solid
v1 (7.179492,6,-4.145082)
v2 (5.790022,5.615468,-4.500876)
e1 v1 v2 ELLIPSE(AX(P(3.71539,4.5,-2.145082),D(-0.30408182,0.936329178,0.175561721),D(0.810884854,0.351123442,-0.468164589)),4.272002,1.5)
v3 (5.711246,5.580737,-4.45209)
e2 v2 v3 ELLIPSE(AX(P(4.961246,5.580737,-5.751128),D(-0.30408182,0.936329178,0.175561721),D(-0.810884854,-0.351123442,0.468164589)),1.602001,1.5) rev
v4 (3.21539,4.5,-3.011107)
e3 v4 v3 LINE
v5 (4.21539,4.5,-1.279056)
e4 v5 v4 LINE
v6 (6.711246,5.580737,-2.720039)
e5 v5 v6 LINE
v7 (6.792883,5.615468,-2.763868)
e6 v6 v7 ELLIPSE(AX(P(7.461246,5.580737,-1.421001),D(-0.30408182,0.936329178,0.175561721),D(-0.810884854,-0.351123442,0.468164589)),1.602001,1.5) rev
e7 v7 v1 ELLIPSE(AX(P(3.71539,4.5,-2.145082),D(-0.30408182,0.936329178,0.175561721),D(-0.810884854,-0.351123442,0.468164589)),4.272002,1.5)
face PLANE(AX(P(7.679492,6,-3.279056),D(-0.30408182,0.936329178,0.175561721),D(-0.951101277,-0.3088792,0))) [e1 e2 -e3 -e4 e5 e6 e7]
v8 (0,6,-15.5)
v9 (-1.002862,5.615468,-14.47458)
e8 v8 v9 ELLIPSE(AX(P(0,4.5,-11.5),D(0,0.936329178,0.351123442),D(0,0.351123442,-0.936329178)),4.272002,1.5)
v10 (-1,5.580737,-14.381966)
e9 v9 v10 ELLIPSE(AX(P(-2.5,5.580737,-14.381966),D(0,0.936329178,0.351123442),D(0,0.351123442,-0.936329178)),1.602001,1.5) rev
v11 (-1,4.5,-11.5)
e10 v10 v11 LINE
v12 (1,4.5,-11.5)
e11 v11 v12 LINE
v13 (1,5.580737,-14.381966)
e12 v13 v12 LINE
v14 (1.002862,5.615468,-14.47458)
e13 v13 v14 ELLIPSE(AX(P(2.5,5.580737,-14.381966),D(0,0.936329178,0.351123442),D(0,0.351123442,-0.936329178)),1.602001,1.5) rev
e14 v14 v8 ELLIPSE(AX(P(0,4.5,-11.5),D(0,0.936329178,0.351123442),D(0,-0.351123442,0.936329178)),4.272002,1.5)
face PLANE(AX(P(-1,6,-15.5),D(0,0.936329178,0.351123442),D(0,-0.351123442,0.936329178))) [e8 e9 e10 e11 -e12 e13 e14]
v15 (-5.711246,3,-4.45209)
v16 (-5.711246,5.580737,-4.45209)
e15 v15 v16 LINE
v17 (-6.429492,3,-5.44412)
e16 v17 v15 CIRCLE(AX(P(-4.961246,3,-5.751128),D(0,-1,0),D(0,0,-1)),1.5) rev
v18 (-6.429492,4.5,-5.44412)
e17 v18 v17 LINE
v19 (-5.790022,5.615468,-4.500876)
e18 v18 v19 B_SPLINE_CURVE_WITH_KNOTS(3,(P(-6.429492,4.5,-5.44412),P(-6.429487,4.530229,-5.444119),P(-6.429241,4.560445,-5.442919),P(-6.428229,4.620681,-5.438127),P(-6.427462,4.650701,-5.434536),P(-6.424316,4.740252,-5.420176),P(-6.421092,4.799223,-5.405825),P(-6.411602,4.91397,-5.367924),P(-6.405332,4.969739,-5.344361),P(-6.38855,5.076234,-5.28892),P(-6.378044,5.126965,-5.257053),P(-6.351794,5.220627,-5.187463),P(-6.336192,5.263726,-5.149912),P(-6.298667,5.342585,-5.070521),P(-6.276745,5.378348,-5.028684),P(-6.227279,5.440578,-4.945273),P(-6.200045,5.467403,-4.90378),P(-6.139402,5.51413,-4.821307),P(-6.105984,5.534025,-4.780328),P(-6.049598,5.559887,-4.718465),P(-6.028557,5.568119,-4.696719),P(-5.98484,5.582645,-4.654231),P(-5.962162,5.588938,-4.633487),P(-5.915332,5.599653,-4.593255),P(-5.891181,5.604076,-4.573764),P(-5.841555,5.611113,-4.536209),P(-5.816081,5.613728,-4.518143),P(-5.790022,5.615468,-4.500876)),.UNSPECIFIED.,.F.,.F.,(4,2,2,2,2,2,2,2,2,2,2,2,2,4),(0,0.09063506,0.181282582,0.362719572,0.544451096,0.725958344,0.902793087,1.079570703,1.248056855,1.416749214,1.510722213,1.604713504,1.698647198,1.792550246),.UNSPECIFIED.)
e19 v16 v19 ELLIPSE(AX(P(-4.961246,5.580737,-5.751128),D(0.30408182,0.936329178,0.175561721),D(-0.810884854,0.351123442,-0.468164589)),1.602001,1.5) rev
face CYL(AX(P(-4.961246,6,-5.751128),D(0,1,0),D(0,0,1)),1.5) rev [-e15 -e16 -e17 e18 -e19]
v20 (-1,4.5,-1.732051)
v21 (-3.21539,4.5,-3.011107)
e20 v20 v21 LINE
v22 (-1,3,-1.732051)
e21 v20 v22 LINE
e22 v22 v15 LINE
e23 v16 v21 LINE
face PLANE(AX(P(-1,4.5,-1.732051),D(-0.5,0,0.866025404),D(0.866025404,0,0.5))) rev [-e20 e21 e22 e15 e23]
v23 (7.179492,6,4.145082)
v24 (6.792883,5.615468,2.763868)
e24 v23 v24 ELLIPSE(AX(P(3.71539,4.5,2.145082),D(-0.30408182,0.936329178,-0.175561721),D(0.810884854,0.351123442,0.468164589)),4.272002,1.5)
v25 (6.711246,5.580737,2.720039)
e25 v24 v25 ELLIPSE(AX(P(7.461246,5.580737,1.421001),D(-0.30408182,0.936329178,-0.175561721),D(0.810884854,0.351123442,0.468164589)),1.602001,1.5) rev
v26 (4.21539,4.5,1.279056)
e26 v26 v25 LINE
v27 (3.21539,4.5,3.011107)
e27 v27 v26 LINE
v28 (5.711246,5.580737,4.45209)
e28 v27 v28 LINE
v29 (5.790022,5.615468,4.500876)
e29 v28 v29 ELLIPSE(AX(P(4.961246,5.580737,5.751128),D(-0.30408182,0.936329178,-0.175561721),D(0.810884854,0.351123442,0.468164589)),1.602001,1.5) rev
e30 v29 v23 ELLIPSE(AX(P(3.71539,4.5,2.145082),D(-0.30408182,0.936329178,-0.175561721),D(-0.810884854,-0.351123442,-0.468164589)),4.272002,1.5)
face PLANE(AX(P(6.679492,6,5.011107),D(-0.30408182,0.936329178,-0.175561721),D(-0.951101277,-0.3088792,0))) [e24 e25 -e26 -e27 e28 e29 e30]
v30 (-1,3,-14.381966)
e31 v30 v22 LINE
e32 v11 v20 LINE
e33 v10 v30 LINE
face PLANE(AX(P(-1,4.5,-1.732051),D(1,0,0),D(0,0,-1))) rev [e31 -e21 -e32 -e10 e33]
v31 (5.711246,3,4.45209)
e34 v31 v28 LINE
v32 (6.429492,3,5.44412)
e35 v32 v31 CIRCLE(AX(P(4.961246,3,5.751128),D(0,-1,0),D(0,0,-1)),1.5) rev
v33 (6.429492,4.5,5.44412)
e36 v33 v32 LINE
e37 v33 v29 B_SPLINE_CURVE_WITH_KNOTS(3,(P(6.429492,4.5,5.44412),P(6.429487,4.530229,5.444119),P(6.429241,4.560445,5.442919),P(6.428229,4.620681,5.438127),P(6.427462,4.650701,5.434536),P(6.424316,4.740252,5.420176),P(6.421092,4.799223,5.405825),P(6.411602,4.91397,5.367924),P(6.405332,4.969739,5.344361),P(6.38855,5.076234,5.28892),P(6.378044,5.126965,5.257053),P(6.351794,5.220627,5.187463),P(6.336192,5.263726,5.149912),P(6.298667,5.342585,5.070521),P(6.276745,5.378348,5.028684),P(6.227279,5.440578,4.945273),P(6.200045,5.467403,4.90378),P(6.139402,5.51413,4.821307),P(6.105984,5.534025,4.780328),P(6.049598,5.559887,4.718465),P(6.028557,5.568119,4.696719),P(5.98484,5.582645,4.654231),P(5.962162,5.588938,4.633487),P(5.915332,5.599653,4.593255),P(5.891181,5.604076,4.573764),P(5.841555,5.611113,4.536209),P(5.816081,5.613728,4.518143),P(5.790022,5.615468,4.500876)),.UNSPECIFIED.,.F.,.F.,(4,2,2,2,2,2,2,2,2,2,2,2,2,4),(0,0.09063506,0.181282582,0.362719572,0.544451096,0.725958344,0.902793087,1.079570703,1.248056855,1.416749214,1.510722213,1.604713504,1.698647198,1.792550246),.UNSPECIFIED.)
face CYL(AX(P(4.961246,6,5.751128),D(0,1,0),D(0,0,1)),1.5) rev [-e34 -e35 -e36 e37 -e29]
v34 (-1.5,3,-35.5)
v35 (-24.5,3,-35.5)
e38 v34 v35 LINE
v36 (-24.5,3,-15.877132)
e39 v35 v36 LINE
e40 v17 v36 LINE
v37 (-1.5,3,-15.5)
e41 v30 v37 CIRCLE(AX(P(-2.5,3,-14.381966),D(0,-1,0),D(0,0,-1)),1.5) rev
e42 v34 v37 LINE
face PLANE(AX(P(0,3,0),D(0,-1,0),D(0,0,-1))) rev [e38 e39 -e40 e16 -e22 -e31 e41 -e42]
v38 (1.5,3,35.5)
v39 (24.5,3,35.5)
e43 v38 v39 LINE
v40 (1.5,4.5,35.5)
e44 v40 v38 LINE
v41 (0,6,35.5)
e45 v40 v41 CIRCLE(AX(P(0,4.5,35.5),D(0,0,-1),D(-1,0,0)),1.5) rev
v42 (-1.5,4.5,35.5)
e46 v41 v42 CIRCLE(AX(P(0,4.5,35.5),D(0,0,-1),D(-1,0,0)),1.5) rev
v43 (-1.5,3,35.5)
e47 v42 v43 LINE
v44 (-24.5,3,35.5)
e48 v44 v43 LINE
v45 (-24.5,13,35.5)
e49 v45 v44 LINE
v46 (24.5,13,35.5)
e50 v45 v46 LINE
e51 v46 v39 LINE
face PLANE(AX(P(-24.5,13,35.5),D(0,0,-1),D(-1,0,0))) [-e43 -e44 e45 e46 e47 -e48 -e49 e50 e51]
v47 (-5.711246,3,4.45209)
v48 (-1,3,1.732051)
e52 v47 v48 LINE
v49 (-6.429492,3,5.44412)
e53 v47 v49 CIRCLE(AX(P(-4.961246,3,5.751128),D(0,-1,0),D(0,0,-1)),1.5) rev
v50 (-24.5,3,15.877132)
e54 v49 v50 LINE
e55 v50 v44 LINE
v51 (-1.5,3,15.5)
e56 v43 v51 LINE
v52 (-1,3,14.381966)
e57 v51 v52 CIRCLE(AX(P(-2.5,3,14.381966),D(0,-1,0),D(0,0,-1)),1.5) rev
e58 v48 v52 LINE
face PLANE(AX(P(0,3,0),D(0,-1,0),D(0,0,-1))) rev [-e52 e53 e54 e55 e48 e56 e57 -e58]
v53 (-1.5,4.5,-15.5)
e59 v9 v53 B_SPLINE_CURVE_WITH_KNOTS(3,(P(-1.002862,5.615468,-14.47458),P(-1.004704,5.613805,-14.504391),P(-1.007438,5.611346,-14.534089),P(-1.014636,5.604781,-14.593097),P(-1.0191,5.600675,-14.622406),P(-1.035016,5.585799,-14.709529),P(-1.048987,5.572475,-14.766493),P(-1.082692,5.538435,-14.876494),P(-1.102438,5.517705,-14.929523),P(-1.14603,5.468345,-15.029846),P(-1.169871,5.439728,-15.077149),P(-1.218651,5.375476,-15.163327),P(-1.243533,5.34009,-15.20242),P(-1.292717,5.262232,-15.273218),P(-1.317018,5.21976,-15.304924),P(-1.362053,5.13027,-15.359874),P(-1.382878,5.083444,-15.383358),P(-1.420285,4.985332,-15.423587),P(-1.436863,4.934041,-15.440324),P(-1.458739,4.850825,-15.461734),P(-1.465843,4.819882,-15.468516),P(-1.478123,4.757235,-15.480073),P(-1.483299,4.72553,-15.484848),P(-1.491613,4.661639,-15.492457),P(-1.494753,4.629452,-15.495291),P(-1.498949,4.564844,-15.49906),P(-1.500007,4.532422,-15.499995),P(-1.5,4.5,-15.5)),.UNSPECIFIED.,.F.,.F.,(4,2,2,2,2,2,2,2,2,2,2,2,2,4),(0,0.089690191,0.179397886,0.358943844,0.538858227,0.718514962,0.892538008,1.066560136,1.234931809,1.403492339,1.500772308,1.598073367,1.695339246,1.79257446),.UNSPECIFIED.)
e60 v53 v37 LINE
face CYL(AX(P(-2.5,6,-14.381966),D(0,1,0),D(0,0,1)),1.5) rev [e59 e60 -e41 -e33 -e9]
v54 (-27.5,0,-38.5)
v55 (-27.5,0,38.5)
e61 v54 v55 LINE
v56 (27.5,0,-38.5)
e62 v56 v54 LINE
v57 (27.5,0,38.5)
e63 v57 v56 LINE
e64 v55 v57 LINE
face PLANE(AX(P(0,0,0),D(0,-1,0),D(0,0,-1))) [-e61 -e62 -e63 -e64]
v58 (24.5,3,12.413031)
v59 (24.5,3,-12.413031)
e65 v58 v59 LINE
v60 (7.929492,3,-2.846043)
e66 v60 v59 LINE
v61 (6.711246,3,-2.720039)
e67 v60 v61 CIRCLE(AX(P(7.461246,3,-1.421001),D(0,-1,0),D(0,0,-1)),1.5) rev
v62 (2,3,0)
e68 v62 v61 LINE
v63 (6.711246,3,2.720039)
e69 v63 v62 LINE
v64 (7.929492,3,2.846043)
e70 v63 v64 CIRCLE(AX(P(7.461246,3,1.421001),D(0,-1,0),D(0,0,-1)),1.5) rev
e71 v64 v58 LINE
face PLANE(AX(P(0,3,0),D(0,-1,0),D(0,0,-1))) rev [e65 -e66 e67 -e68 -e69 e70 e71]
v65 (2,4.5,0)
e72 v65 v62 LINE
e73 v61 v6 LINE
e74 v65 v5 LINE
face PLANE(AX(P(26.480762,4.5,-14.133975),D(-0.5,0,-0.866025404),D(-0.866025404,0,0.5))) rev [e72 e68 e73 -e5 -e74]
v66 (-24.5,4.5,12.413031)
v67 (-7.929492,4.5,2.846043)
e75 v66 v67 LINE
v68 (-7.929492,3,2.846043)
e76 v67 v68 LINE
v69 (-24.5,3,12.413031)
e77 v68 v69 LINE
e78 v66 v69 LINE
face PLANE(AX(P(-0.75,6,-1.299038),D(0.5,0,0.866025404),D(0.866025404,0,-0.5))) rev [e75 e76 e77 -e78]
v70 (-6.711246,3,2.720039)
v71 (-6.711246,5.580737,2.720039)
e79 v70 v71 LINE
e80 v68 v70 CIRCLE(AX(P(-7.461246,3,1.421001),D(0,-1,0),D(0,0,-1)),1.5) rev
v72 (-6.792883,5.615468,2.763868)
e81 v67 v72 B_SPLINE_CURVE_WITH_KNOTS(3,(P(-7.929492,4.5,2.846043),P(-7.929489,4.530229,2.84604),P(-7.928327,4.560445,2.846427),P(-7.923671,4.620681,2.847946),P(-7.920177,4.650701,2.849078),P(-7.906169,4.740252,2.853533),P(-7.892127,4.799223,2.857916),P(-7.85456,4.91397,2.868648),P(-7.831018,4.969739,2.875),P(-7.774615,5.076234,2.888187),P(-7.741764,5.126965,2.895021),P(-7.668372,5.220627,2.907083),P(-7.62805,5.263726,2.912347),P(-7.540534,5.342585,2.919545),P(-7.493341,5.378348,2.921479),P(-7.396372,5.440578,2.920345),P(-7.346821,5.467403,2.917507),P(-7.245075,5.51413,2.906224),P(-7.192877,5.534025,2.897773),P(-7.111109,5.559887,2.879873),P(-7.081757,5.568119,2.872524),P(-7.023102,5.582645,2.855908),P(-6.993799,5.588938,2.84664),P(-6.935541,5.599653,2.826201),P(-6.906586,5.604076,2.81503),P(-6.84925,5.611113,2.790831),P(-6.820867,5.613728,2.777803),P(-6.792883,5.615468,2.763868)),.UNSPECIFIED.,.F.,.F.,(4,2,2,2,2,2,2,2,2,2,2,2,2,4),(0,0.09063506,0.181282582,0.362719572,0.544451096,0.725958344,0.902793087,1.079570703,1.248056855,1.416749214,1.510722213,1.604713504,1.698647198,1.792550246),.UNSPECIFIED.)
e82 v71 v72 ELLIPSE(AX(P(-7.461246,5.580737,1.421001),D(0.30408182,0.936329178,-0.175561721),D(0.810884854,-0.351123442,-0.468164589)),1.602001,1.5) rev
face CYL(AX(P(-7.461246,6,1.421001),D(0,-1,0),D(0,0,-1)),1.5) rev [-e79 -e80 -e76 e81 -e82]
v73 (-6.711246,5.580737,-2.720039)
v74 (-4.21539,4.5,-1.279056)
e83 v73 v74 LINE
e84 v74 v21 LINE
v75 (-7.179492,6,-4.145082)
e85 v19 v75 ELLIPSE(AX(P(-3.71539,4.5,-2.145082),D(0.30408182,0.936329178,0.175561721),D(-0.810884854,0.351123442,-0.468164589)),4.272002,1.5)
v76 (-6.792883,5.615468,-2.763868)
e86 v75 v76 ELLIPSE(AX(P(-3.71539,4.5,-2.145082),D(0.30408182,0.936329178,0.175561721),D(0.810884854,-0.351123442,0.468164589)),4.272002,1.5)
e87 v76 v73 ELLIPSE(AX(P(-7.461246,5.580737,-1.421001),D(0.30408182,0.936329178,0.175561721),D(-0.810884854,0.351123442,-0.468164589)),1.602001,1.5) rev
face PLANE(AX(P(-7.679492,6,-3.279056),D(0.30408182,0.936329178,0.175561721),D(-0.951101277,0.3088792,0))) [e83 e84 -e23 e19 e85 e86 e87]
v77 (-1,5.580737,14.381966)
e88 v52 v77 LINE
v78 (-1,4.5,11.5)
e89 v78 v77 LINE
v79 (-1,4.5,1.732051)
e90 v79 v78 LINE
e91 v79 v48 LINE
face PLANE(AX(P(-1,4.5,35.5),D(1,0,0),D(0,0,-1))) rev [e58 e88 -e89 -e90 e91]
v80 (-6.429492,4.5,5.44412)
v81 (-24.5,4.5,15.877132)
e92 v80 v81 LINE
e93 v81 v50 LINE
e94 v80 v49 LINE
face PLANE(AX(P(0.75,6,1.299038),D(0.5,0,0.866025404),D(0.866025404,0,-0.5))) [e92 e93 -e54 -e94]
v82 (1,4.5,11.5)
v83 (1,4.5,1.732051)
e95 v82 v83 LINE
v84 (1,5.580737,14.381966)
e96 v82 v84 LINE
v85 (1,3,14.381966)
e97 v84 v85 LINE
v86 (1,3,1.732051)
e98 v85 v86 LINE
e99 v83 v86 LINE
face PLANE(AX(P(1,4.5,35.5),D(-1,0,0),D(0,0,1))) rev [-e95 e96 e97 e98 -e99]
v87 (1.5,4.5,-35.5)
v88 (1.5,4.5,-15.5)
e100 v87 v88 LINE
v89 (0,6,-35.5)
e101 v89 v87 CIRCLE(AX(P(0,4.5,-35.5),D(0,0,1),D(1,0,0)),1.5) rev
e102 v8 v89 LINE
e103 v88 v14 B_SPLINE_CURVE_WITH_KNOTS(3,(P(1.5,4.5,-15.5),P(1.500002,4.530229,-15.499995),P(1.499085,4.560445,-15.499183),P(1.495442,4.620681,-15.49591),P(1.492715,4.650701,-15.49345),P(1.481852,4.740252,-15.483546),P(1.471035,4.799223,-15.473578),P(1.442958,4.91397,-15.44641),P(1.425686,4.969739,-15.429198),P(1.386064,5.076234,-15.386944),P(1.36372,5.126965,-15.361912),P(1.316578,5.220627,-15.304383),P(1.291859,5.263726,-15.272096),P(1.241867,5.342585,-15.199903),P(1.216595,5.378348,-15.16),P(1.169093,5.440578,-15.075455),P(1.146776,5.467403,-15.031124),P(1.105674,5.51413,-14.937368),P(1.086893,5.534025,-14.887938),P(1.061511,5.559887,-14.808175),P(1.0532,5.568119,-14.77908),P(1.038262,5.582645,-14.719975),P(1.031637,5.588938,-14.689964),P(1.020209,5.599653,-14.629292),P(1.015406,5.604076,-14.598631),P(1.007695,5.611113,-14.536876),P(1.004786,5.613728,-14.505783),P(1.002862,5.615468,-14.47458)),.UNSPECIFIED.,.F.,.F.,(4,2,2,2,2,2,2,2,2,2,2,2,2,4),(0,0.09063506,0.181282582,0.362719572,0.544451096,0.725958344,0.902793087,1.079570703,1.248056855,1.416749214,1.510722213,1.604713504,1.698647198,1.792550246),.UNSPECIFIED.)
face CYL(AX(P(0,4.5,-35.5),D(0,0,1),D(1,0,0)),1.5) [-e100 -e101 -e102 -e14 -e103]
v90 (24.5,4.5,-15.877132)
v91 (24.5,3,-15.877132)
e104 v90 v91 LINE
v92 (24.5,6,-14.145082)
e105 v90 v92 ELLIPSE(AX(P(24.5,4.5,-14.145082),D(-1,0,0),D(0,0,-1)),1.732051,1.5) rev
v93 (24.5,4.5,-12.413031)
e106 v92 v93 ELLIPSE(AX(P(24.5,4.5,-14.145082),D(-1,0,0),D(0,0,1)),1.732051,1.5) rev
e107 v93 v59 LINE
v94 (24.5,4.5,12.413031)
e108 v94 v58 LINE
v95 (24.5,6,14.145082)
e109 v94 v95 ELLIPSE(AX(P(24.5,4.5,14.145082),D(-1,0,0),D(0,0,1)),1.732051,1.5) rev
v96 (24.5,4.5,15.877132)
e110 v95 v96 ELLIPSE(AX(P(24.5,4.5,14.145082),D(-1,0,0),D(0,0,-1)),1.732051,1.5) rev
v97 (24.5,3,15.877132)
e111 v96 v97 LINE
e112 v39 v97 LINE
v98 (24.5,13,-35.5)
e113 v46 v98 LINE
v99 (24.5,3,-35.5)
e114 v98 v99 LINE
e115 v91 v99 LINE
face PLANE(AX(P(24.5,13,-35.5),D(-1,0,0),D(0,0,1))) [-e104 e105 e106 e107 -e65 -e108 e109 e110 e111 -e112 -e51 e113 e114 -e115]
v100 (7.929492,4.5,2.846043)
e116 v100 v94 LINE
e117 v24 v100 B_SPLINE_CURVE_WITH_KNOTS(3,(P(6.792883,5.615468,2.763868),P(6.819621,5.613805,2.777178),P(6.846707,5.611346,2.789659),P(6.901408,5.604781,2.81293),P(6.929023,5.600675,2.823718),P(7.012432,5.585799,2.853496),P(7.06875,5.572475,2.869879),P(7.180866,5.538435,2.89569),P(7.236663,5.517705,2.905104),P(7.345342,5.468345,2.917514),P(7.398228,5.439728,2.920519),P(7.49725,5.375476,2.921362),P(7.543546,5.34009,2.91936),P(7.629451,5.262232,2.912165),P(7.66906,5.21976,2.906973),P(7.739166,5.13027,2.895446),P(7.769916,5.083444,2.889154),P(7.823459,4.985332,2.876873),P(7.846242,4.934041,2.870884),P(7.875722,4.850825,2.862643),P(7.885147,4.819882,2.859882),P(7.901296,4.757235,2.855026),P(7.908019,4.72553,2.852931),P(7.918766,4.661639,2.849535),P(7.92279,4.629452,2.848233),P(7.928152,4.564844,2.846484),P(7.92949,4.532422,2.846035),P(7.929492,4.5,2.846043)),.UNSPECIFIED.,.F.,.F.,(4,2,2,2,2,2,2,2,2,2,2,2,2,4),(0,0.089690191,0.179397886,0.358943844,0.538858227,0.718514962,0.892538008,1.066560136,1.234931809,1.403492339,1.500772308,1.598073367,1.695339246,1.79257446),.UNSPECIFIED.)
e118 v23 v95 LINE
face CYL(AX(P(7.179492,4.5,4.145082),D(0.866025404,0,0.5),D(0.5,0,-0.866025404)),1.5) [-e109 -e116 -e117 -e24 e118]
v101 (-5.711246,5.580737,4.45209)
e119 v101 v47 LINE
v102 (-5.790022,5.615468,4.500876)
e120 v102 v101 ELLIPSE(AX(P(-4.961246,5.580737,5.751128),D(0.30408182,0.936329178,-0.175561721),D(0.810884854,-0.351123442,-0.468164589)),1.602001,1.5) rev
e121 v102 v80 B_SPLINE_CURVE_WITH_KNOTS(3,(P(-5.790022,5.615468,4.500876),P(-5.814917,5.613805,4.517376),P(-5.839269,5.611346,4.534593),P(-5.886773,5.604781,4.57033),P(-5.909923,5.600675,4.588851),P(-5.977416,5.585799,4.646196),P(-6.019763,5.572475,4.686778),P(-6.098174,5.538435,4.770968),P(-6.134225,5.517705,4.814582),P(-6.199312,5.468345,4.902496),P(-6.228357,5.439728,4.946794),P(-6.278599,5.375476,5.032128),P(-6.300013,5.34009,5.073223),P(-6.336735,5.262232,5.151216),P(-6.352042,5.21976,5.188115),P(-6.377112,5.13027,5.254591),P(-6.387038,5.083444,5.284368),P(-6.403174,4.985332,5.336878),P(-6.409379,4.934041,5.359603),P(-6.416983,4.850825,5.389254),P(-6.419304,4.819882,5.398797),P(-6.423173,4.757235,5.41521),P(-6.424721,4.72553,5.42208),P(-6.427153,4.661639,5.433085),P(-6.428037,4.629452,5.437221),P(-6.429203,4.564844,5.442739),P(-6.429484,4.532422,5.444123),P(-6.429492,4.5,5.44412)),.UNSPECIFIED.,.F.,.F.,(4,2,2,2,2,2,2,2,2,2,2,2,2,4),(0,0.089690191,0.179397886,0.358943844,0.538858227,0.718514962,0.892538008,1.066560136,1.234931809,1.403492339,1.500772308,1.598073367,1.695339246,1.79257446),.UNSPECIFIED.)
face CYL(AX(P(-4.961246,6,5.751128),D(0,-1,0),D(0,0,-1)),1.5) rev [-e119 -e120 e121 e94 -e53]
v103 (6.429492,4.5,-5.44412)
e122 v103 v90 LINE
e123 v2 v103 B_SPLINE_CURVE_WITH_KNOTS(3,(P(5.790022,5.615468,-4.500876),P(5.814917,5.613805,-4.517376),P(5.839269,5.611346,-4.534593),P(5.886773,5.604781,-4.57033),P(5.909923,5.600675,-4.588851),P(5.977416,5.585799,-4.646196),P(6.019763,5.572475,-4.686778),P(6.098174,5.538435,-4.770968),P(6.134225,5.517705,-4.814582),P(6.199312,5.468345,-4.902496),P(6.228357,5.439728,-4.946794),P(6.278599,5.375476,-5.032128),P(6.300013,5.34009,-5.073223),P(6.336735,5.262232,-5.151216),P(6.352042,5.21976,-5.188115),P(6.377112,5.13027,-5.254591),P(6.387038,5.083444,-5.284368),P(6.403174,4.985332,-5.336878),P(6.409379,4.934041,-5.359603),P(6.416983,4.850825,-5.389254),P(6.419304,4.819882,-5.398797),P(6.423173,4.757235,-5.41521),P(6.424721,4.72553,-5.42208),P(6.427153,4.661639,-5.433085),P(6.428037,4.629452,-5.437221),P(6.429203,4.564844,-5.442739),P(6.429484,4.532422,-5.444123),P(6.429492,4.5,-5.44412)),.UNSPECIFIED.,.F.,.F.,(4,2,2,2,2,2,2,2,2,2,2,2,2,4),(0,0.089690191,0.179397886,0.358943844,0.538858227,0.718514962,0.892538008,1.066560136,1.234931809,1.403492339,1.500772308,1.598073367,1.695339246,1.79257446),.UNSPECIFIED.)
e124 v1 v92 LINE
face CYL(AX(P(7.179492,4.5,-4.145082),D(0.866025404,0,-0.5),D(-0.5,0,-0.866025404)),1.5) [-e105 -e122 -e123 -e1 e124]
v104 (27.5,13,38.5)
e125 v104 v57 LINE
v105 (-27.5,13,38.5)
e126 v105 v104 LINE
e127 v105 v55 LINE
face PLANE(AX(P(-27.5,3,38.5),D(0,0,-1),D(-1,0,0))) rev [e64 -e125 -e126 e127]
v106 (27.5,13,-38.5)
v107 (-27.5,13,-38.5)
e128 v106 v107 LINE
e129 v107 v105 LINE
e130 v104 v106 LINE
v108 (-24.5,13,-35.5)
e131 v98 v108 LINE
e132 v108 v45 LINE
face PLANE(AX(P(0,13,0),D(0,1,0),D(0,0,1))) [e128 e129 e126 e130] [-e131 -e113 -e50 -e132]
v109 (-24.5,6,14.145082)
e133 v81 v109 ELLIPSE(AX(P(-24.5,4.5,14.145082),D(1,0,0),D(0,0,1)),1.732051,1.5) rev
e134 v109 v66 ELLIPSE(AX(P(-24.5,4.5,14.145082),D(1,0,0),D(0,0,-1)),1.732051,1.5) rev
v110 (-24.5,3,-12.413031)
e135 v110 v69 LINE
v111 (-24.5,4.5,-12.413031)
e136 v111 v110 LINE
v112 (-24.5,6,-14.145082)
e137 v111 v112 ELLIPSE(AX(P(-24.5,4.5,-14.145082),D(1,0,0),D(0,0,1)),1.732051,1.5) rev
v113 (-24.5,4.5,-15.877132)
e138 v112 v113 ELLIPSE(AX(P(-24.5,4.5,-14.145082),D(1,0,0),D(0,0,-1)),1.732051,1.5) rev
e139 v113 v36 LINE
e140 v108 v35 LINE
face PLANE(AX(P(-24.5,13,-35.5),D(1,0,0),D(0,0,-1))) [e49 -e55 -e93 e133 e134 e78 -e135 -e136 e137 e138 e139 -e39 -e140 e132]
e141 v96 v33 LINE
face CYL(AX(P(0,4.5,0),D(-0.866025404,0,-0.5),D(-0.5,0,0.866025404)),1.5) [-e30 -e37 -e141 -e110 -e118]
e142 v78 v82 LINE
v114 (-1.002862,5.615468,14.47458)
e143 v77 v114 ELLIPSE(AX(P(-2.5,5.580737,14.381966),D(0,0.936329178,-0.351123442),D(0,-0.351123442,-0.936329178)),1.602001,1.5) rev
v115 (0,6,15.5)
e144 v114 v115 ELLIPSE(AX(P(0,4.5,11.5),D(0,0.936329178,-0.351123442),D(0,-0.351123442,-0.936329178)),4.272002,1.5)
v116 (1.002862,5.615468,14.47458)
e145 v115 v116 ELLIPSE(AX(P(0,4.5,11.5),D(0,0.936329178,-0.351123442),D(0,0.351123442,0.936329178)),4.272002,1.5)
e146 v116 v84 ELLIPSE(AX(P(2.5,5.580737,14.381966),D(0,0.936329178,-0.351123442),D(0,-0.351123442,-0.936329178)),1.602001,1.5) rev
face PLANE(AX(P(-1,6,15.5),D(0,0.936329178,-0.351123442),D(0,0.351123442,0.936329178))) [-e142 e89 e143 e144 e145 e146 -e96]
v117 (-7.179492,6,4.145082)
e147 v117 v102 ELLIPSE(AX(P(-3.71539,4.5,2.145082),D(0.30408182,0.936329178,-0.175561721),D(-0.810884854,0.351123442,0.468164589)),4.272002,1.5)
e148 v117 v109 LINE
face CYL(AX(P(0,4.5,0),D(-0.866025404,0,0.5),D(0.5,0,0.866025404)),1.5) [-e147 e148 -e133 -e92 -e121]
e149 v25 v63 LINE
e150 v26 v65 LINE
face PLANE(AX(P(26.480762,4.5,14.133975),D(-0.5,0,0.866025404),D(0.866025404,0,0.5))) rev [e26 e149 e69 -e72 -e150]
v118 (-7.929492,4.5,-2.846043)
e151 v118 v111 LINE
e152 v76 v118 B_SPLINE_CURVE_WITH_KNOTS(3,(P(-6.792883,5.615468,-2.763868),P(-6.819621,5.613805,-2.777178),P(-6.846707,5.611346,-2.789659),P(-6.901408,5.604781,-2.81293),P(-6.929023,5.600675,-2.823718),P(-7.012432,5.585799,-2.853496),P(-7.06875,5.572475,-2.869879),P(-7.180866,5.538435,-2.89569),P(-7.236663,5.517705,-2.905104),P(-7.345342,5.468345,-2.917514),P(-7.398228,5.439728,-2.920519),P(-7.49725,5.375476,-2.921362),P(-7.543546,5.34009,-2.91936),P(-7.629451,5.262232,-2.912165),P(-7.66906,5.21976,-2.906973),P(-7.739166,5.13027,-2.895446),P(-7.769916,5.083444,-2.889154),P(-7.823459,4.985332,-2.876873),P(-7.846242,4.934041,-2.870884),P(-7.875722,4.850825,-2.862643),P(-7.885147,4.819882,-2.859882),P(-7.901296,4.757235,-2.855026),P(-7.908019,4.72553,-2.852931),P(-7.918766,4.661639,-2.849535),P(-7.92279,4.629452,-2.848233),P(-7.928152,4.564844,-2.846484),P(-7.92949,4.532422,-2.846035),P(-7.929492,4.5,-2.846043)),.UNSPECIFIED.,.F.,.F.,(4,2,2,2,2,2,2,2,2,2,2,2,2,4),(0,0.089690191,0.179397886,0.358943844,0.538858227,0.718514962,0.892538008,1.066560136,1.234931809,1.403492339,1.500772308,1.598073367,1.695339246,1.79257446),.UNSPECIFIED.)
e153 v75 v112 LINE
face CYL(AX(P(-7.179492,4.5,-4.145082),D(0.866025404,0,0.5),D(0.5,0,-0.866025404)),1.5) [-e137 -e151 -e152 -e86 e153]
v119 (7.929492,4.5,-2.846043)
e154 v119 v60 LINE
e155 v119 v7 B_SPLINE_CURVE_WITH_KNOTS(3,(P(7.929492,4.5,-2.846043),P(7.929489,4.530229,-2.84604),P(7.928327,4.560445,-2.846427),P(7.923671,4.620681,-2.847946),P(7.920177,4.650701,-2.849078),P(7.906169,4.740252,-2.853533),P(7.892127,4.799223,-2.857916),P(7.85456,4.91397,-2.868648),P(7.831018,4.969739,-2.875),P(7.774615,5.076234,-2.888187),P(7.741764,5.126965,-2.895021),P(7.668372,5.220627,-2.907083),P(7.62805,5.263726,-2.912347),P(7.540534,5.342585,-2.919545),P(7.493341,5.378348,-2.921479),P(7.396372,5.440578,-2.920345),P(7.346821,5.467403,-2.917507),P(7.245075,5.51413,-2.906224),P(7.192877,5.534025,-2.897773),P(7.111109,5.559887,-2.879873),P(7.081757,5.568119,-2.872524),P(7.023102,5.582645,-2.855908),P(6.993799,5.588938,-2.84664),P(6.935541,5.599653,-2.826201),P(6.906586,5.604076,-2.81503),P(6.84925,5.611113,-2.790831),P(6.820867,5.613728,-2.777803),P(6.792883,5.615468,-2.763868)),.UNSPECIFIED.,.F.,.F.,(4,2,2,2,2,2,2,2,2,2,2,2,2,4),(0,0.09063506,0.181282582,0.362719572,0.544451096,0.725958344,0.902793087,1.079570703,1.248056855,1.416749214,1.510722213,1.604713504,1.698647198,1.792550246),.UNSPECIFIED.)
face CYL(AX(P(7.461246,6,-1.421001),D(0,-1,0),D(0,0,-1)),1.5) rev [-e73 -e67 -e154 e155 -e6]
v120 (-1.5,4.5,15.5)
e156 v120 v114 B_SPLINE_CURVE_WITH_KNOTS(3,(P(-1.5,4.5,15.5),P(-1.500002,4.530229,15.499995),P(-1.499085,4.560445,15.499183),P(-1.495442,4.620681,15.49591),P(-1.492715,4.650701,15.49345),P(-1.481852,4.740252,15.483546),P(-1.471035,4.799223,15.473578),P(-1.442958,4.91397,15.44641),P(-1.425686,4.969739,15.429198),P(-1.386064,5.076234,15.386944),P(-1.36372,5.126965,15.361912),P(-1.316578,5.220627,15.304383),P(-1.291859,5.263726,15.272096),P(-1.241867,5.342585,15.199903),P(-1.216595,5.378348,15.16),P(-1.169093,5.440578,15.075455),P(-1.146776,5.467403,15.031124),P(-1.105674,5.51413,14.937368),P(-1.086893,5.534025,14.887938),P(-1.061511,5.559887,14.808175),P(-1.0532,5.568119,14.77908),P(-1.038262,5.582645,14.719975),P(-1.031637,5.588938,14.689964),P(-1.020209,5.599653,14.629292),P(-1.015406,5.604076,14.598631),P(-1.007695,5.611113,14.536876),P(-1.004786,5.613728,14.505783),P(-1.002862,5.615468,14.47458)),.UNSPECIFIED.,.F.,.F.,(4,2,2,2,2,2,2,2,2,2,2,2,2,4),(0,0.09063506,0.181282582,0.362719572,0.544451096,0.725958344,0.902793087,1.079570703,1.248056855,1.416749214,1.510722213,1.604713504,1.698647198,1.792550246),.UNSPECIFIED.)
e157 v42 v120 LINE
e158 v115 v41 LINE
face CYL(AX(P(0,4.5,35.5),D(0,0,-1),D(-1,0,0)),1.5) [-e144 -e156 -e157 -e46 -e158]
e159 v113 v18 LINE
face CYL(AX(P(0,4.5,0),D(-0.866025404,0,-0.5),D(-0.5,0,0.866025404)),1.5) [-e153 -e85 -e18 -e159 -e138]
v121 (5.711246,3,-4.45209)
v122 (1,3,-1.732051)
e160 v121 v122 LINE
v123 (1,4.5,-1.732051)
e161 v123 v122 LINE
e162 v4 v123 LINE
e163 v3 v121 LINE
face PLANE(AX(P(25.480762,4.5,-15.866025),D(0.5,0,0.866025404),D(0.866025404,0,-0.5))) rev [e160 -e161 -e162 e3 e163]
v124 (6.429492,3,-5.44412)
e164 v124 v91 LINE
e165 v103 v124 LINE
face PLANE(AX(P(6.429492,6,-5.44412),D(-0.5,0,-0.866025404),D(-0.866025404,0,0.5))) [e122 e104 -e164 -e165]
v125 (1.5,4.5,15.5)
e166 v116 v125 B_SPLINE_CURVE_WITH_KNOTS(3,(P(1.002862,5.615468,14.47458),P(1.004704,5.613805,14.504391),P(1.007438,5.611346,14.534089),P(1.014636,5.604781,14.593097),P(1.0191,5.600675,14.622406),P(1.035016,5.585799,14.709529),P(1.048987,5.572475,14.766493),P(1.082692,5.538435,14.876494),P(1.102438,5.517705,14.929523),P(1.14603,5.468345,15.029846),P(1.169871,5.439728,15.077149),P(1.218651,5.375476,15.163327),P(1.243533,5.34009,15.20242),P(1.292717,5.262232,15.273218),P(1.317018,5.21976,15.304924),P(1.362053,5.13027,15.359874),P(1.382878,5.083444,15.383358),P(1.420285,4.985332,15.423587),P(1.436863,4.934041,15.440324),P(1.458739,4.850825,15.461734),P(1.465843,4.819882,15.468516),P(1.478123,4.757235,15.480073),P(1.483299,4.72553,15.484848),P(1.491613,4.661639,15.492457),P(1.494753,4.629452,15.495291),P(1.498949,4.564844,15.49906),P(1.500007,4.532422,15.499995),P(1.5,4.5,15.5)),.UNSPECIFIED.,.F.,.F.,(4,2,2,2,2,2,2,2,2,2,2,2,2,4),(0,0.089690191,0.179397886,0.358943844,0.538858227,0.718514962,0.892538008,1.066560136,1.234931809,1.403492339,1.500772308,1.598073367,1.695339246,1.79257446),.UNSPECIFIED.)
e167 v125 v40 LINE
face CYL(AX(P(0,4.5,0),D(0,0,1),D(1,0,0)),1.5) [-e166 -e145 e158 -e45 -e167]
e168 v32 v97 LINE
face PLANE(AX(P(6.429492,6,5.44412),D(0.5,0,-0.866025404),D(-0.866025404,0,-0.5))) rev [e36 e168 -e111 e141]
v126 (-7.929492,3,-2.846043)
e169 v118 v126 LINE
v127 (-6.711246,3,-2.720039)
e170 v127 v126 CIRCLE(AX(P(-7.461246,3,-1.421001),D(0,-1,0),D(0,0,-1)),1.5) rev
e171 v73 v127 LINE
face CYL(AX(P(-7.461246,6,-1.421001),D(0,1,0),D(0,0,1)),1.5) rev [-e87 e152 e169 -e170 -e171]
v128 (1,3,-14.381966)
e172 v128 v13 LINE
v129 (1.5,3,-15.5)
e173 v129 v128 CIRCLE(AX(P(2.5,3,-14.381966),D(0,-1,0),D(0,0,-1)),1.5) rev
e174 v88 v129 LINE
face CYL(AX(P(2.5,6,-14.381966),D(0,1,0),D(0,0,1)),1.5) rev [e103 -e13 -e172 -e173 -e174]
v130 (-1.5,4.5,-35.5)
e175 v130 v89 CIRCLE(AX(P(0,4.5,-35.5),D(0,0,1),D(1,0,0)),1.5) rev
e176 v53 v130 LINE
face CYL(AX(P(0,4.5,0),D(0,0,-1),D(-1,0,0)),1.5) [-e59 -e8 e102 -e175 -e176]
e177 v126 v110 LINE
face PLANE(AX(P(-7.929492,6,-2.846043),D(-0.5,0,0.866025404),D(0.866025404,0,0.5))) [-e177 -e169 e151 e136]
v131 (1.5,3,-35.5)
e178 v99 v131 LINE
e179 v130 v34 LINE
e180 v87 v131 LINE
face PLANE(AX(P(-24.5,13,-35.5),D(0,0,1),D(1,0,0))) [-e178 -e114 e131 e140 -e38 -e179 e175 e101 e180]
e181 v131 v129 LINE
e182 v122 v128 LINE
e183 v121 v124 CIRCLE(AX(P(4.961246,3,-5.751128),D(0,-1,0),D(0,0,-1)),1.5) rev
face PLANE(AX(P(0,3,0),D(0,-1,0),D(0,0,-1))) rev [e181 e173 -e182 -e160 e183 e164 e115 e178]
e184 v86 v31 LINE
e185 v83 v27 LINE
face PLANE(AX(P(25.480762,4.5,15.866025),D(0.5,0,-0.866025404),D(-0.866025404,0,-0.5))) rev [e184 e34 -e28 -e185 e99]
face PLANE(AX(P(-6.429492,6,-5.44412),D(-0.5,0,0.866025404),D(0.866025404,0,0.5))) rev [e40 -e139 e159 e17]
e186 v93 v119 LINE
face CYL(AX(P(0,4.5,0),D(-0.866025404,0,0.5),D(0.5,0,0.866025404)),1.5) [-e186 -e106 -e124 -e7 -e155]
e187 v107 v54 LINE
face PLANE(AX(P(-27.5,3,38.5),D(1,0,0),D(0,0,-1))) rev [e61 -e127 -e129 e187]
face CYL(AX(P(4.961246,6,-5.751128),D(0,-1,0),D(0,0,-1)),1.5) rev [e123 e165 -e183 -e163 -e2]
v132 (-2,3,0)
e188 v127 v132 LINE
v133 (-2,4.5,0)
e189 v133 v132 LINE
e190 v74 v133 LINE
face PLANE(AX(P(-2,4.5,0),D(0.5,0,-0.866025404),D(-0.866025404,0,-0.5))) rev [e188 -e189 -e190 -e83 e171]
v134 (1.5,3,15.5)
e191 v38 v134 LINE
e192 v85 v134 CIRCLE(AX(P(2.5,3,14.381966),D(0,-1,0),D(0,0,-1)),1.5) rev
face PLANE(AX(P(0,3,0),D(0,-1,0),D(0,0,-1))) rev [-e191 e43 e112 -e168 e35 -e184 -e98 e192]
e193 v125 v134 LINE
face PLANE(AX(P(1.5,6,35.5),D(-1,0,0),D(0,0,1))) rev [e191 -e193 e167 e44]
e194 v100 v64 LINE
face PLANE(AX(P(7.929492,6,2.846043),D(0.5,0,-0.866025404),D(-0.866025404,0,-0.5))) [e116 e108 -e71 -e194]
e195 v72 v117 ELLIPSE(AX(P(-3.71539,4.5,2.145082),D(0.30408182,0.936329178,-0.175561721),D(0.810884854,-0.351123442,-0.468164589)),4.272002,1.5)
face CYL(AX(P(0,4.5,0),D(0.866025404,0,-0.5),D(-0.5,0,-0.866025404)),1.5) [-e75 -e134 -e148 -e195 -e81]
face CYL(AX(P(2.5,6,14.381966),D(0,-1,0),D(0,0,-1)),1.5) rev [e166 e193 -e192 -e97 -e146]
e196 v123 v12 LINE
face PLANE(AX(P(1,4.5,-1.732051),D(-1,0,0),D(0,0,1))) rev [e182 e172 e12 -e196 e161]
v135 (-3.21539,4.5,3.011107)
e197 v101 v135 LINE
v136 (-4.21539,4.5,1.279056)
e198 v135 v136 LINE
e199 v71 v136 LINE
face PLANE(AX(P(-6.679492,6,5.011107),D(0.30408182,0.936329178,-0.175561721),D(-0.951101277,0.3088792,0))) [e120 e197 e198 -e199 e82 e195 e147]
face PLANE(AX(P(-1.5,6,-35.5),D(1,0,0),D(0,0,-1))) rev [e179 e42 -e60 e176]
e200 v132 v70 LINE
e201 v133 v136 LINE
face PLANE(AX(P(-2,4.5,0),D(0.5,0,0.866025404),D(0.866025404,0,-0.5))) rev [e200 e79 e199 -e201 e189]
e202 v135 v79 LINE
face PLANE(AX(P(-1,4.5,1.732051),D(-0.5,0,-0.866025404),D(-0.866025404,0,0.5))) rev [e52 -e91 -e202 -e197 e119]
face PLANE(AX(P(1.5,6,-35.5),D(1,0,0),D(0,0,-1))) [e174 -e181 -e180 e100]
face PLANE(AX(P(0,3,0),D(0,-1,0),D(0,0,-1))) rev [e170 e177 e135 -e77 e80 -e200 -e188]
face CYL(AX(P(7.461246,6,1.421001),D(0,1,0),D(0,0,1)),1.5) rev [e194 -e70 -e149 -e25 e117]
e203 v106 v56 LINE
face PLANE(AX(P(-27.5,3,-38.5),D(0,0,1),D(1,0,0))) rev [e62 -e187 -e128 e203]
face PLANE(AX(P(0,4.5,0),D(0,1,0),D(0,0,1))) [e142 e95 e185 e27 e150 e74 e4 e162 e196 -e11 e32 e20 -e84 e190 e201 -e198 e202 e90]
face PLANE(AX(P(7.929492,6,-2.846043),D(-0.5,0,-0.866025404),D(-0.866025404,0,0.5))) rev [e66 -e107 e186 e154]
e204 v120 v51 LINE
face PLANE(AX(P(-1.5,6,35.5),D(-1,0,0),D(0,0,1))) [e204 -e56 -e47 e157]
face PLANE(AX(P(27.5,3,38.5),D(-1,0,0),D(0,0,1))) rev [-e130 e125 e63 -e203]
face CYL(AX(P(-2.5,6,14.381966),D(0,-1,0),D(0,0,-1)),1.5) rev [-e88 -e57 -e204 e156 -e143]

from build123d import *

# Parameters (mm, degrees)
ESQUISSE1_W        = 55
ESQUISSE1_H        = 77
BOSS_EXTRU_1_DEPTH = 3
ESQUISSE2_W        = 55
ESQUISSE2_H        = 77
BOSS_EXTRU_2_DEPTH = 10
BOSS_EXTRU_5_DEPTH = 1.5
BOSS_EXTRU_6_DEPTH = 3
BOSS_EXTRU_7_DEPTH = 2
BOSS_EXTRU_8_DEPTH = 2
BOSS_EXTRU_9_DEPTH = 2
CONG_3_R           = 1.5
CONG_4_R           = 1.5


# Some blends are built 0.0001 mm under size
with BuildPart() as part:
    # Esquisse1 → Boss.-Extru.1 (new body)
    with BuildSketch(Plane(origin=(0, 0, 0), x_dir=(1, 0, 0), z_dir=(0, 1, 0))):
        Rectangle(ESQUISSE1_W, ESQUISSE1_H)
    extrude(amount=BOSS_EXTRU_1_DEPTH)

    # Esquisse2 → Boss.-Extru.2 (add)
    with BuildSketch(Plane(origin=(0, 3, 0), x_dir=(1, 0, 0), z_dir=(0, 1, 0))):
        Rectangle(ESQUISSE2_W, ESQUISSE2_H)
        Polygon((-24.499999999999993, 35.50000000000001), (-24.499999999999982, -35.49999999999999), (24.500000000000007, -35.49999999999999), (24.499999999999993, 35.50000000000001), align=None, mode=Mode.SUBTRACT)
    extrude(amount=BOSS_EXTRU_2_DEPTH)

    # Esquisse3 → Boss.-Extru.5 (add)
    with BuildSketch(Plane(origin=(0, 3, 0), x_dir=(1, 0, 0), z_dir=(0, 1, 0))):
        Polygon((-1.0000000000000002, -35.500000000000014), (-1.000000000000001, -1.7320508075692145), (-25.4807621135329, -15.866025403784949), (-26.480762113533657, -14.133974596214742), (-2.000000000001547, 2.4e-16), (-26.480762113533604, 14.133974596214733), (-25.48076211353285, 15.866025403784942), (-1.0000000000003295, 1.7320508075699388), (-1.0000000000000002, 35.5), (0.9999999999999998, 35.5), (1.0000000000000004, 1.73205080756975), (25.48076211353284, 15.866025403784917), (26.4807621135336, 14.133974596214713), (2.0000000000011395, 2.3766e-13), (26.480762113533643, -14.133974596214754), (25.480762113532894, -15.86602540378496), (1.0000000000000002, -1.732050807569746), (0.9999999999999998, -35.500000000000014), align=None)
    extrude(amount=BOSS_EXTRU_5_DEPTH)

    # Esquisse4 → Boss.-Extru.6 (add)
    with BuildSketch(Plane(origin=(0, 3, 0), x_dir=(1, 0, 0), z_dir=(0, 1, 0))):
        Polygon((-7.929491924311156, -2.8460434894690736), (-26.335106973446237, -13.472530292687704), (-24.835106973446255, -16.070606504041027), (-6.429491924311169, -5.444119700822397), align=None)
        Polygon((1.4999999999999996, 35.50000000000001), (1.5000000000000027, 15.500000000000004), (-1.4999999999999978, 15.500000000000004), (-1.4999999999999996, 35.50000000000001), align=None)
        Polygon((-7.929491924311157, 2.846043489469073), (-6.429491924311172, 5.444119700822394), (-24.835106973446262, 16.070606504041017), (-26.33510697344624, 13.472530292687692), align=None)
        Polygon((7.929491924311156, 2.8460434894690683), (6.429491924311175, 5.44411970082239), (24.835106973446265, 16.070606504041002), (26.335106973446248, 13.47253029268768), align=None)
        Polygon((6.429491924311165, -5.444119700822401), (24.835106973446248, -16.07060650404104), (26.33510697344623, -13.472530292687718), (7.929491924311156, -2.846043489469078), align=None)
        Polygon((1.5000000000000113, -15.500000000000004), (-1.4999999999999891, -15.500000000000004), (-1.4999999999999796, -35.50000000000001), (1.5000000000000195, -35.50000000000001), align=None)
    extrude(amount=BOSS_EXTRU_6_DEPTH)

    # Esquisse5 → Boss.-Extru.7 (add)
    with BuildSketch(Plane(origin=(1.0000000000000004, 0, -2e-17), x_dir=(-2e-17, 0, -1), z_dir=(1, 0, -2e-17))):
        Polygon((15.500000000000004, 4.500000000000001), (15.500000000000004, 6), (11.500000000000004, 4.500000000000001), align=None)
        Polygon((-15.500000000000004, 4.500000000000001), (-15.500000000000004, 6), (-11.500000000000004, 4.500000000000001), align=None)
    extrude(amount=-BOSS_EXTRU_7_DEPTH)

    # Esquisse6 → Boss.-Extru.8 (add)
    with BuildSketch(Plane(origin=(0.5000000000003775, 0, -0.8660254037851042), x_dir=(-0.8660254037844415, 0, -0.4999999999999951), z_dir=(0.4999999999999951, 0, -0.8660254037844415))):
        Polygon((8.29016319029156, 4.500000000000001), (8.29016319029156, 6), (4.29016319029156, 4.500000000000001), align=None)
        Polygon((-8.290163190291564, 4.500000000000001), (-8.290163190291564, 6), (-4.290163190291564, 4.500000000000001), align=None)
    extrude(amount=-BOSS_EXTRU_8_DEPTH)

    # Esquisse7 → Boss.-Extru.9 (add)
    with BuildSketch(Plane(origin=(-0.5000000000003755, 0, -0.8660254037851022), x_dir=(-0.8660254037844419, 0, 0.4999999999999942), z_dir=(-0.4999999999999943, 0, -0.866025403784442))):
        Polygon((8.29016319029156, 4.500000000000001), (8.29016319029156, 6), (4.29016319029156, 4.500000000000001), align=None)
        Polygon((-8.290163190291565, 4.500000000000001), (-8.290163190291565, 6), (-4.290163190291565, 4.500000000000001), align=None)
    extrude(amount=-BOSS_EXTRU_9_DEPTH)

    # Congé3
    # the kernel refuses this fillet: 1.5 mm, written as the material it adds along each edge
    with BuildSketch(Plane(origin=(7.679491924311542, 0.20491502812697915, 3.279056191360634), x_dir=(-0.8660254037844417, 0, -0.4999999999999947), z_dir=(3e-16, 1, 1.04e-15))) as cong_3_piece_1_section:
        with BuildLine():
            CenterArc((1.1180339887492077, -1.5), CONG_3_R, 90, 48.189685104182075)
            Line((-1.03e-15, -0.49999999999923256), (-0.02236067977498537, -0.47999999999921733))
            ThreePointArc((-0.02236067977498537, -0.47999999999921733), (-0.02999999999999965, -0.2499999999996152), (-0.02999999999999979, 4.5e-16))
            Line((-0.02999999999999979, 4.5e-16), (-1.6e-16, 0.02999999999999995))
            Line((-1.6e-16, 0.02999999999999995), (1.1180339887492075, 0.02999999999999995))
            Line((1.1180339887492075, 0.02999999999999995), (1.1180339887492077, -2e-17))
        make_face()
    cong_3_piece_1 = extrude(amount=5.79508497187302, mode=Mode.PRIVATE)
    cong_3_piece_1 = split(cong_3_piece_1, bisect_by=Plane(origin=(6.26635238214522, 5.3609166378917985, 2.318241078666916), z_dir=(0.30408182027976954, -0.9363291775690448, 0.17556172079419408)), keep=Keep.TOP, mode=Mode.PRIVATE)
    add(cong_3_piece_1)
    with BuildSketch(Plane(origin=(6.679491924310785, 0.20491502812694629, 5.011106998930838), x_dir=(-0.8660254037844417, 1.8491723322253147e-15, -0.49999999999999484), z_dir=(2.558e-13, 1, -4.3935e-13))) as cong_3_piece_2_section:
        with BuildLine():
            CenterArc((1.1180339887492197, 1.5000000000000004), CONG_3_R, 221.81031489581747, 48.1896851041825)
            Line((3.04e-15, 0.4999999999992415), (-0.02236067977498087, 0.47999999999922616))
            ThreePointArc((-0.02236067977498087, 0.47999999999922616), (-0.02999999999999789, 0.24999999999962141), (-0.02999999999999957, 6e-17))
            Line((-0.02999999999999957, 6e-17), (-6e-17, -0.02999999999999957))
            Line((-6e-17, -0.02999999999999957), (1.118033988749219, -0.02999999999999961))
            Line((1.118033988749219, -0.02999999999999961), (1.1180339887492192, -3e-17))
        make_face()
    cong_3_piece_2 = extrude(amount=5.795084971873054, mode=Mode.PRIVATE)
    cong_3_piece_2 = split(cong_3_piece_2, bisect_by=Plane(origin=(5.140831857295212, 5.360916637891802, 4.267699812668763), z_dir=(0.30408182027976954, -0.9363291775690448, 0.17556172079419408)), keep=Keep.TOP, mode=Mode.PRIVATE)
    add(cong_3_piece_2)
    with BuildSketch(Plane(origin=(6.679491924310787, 0.2049150281269747, -5.011106998930838), x_dir=(-0.8660254037844415, 2.4159205118947413e-15, 0.49999999999999484), z_dir=(2.96e-15, 1, 3e-16))) as cong_3_piece_3_section:
        with BuildLine():
            CenterArc((1.118033988749203, -1.5), CONG_3_R, 89.99999999999994, 48.18968510418185)
            Line((-1.5e-16, -0.4999999999992273), (-0.02236067977498403, -0.47999999999921195))
            ThreePointArc((-0.02236067977498403, -0.47999999999921195), (-0.0299999999999991, -0.24999999999961453), (-0.02999999999999956, -6e-17))
            Line((-0.02999999999999956, -6e-17), (-6e-17, 0.02999999999999956))
            Line((-6e-17, 0.02999999999999956), (1.1180339887492046, 0.02999999999999955))
            Line((1.1180339887492046, 0.02999999999999955), (1.1180339887492046, -3e-17))
        make_face()
    cong_3_piece_3 = extrude(amount=5.795084971873026, mode=Mode.PRIVATE)
    cong_3_piece_3 = split(cong_3_piece_3, bisect_by=Plane(origin=(5.140831857294852, 5.360916637891798, -4.26769981266937), z_dir=(0.30408182027976965, -0.9363291775690445, -0.17556172079419374)), keep=Keep.TOP, mode=Mode.PRIVATE)
    add(cong_3_piece_3)
    with BuildSketch(Plane(origin=(7.679491924311382, 0.20491502812626994, -3.279056191360903), x_dir=(0.49999999999999595, 4.028111296295061e-13, 0.866025403784441), z_dir=(-1.9925e-13, 1, -3.5009e-13))) as cong_3_piece_4_section:
        with BuildLine():
            CenterArc((1.4999999999999813, -1.1180339887495117), CONG_3_R, 131.81031489580056, 48.18968510419856)
            Line((-1.912e-14, -1.118033988749488), (-0.03000000000001908, -1.1180339887494877))
            Line((-0.03000000000001908, -1.1180339887494877), (-0.02999999999999995, 2e-16))
            Line((-0.02999999999999995, 2e-16), (-2e-17, 0.02999999999999957))
            ThreePointArc((-2e-17, 0.02999999999999957), (0.24999999999977643, 0.02999999999999957), (0.479999999999544, 0.02236067977498998))
            Line((0.479999999999544, 0.02236067977498998), (0.4999999999995529, 1e-17))
        make_face()
    cong_3_piece_4 = extrude(amount=5.79508497187373, mode=Mode.PRIVATE)
    cong_3_piece_4 = split(cong_3_piece_4, bisect_by=Plane(origin=(6.26635238214469, 5.360916637891739, -2.3182410786675236), z_dir=(0.30408182027976965, -0.9363291775690445, -0.17556172079419374)), keep=Keep.TOP, mode=Mode.PRIVATE)
    add(cong_3_piece_4)
    with BuildSketch(Plane(origin=(-1.0000000000001952, 0.2049150281256935, -15.500000000000004), x_dir=(-9.73e-15, 0, 1), z_dir=(6.517e-14, 1, 0))) as cong_3_piece_5_section:
        with BuildLine():
            CenterArc((1.118033988749723, -1.5), CONG_3_R, 90.00000000000003, 48.189685104211264)
            Line((4.87e-15, -0.4999999999998024), (-0.02236067977498978, -0.47999999999979837))
            ThreePointArc((-0.02236067977498978, -0.47999999999979837), (-0.02999999999999693, -0.2499999999999015), (-0.02999999999999936, -2.9e-16))
            Line((-0.02999999999999936, -2.9e-16), (-2.9e-16, 0.03000000000000003))
            Line((-2.9e-16, 0.03000000000000003), (1.1180339887497224, 0.03000000000000003))
            Line((1.1180339887497224, 0.03000000000000003), (1.1180339887497226, 0))
        make_face()
    cong_3_piece_5 = extrude(amount=5.7950849718743065, mode=Mode.PRIVATE)
    cong_3_piece_5 = split(cong_3_piece_5, bisect_by=Plane(origin=(-1.1255205248498867, 5.36091663789169, -13.79577770104451), z_dir=(0, -0.9363291775690445, -0.35112344158839154)), keep=Keep.TOP, mode=Mode.PRIVATE)
    add(cong_3_piece_5)
    with BuildSketch(Plane(origin=(1.0000000000000002, 0.2049150281252583, -15.500000000000004), x_dir=(-2e-16, 0, 1), z_dir=(0, 1, 0))) as cong_3_piece_6_section:
        with BuildLine():
            CenterArc((1.1180339887498965, 1.5), CONG_3_R, 221.81031489577848, 48.18968510422155)
            Line((-1e-16, 0.5000000000000022), (-0.0223606797749981, 0.4800000000000022))
            ThreePointArc((-0.0223606797749981, 0.4800000000000022), (-0.02999999999999941, 0.2500000000000011), (-0.02999999999999936, -1e-17))
            Line((-0.02999999999999936, -1e-17), (1e-17, -0.03000000000000003))
            Line((1e-17, -0.03000000000000003), (1.1180339887498967, -0.03000000000000003))
            Line((1.1180339887498967, -0.03000000000000003), (1.1180339887498967, 0))
        make_face()
    cong_3_piece_6 = extrude(amount=5.795084971874742, mode=Mode.PRIVATE)
    cong_3_piece_6 = split(cong_3_piece_6, bisect_by=Plane(origin=(1.1255205248498363, 5.360916637891653, -13.795777701044411), z_dir=(0, -0.9363291775690445, -0.35112344158839154)), keep=Keep.TOP, mode=Mode.PRIVATE)
    add(cong_3_piece_6)
    with BuildSketch(Plane(origin=(-7.67949192431154, 0.20491502812696538, -3.2790561913606355), x_dir=(0.8660254037844416, 0, 0.49999999999999506), z_dir=(2.552e-13, 1, -4.4157e-13))) as cong_3_piece_7_section:
        with BuildLine():
            CenterArc((1.1180339887492157, -1.5), CONG_3_R, 90.00000000000003, 48.189685104182416)
            Line((3.9e-16, -0.4999999999992401), (-0.02236067977498396, -0.4799999999992249))
            ThreePointArc((-0.02236067977498396, -0.4799999999992249), (-0.02999999999999911, -0.24999999999961958), (-0.02999999999999957, 6e-17))
            Line((-0.02999999999999957, 6e-17), (-1.7e-16, 0.02999999999999995))
            Line((-1.7e-16, 0.02999999999999995), (1.118033988749215, 0.02999999999999993))
            Line((1.118033988749215, 0.02999999999999993), (1.1180339887492152, 2e-17))
        make_face()
    cong_3_piece_7 = extrude(amount=5.795084971873035, mode=Mode.PRIVATE)
    cong_3_piece_7 = split(cong_3_piece_7, bisect_by=Plane(origin=(-6.266352382144866, 5.360916637891801, -2.318241078667536), z_dir=(-0.30408182027976954, -0.9363291775690448, -0.17556172079419408)), keep=Keep.TOP, mode=Mode.PRIVATE)
    add(cong_3_piece_7)
    with BuildSketch(Plane(origin=(-6.679491924310783, 0.20491502812699558, -5.011106998930843), x_dir=(0.49999999999999273, 0, -0.8660254037844428), z_dir=(-5.9e-16, 1, -3e-16))) as cong_3_piece_8_section:
        with BuildLine():
            CenterArc((1.4999999999999964, -1.1180339887492052), CONG_3_R, 131.8103148958181, 48.18968510418176)
            Line((-3.77e-15, -1.1180339887492012), (-0.03000000000000333, -1.118033988749201))
            Line((-0.03000000000000333, -1.118033988749201), (-0.02999999999999956, 1.3e-16))
            Line((-0.02999999999999956, 1.3e-16), (1.3e-16, 0.02999999999999957))
            ThreePointArc((1.3e-16, 0.02999999999999957), (0.2499999999996134, 0.0299999999999988), (0.4799999999992104, 0.02236067977498394))
            Line((0.4799999999992104, 0.02236067977498394), (0.4999999999992257, 2e-17))
        make_face()
    cong_3_piece_8 = extrude(amount=5.795084971873004, mode=Mode.PRIVATE)
    cong_3_piece_8 = split(cong_3_piece_8, bisect_by=Plane(origin=(-5.140831857294851, 5.3609166378918, -4.267699812669376), z_dir=(-0.30408182027976954, -0.9363291775690448, -0.17556172079419408)), keep=Keep.TOP, mode=Mode.PRIVATE)
    add(cong_3_piece_8)
    with BuildSketch(Plane(origin=(1, 0.2049150281252361, 15.500000000000004), x_dir=(0, 0, -1), z_dir=(2.2e-16, 1, 0))) as cong_3_piece_9_section:
        with BuildLine():
            CenterArc((1.1180339887499056, -1.5), CONG_3_R, 90, 48.18968510422201)
            Line((0, -0.5000000000000115), (-0.022360679774998, -0.48000000000001175))
            ThreePointArc((-0.022360679774998, -0.48000000000001175), (-0.02999999999999936, -0.2500000000000058), (-0.02999999999999936, 0))
            Line((-0.02999999999999936, 0), (0, 0.03000000000000003))
            Line((0, 0.03000000000000003), (1.1180339887499056, 0.03000000000000003))
            Line((1.1180339887499056, 0.03000000000000003), (1.1180339887499056, 0))
        make_face()
    cong_3_piece_9 = extrude(amount=5.795084971874764, mode=Mode.PRIVATE)
    cong_3_piece_9 = split(cong_3_piece_9, bisect_by=Plane(origin=(1.1255205248498388, 5.360916637891652, 13.795777701044408), z_dir=(0, -0.9363291775690445, 0.35112344158839154)), keep=Keep.TOP, mode=Mode.PRIVATE)
    add(cong_3_piece_9)
    with BuildSketch(Plane(origin=(-1.0000000000000007, 0.20491502812529383, 15.500000000000004), x_dir=(-2e-16, 0, -1), z_dir=(4.8e-16, 1, 0))) as cong_3_piece_10_section:
        with BuildLine():
            CenterArc((1.1180339887498827, 1.5), CONG_3_R, 221.81031489577921, 48.18968510422076)
            Line((-1.68e-15, 0.49999999999998757), (-0.02236067977499969, 0.4799999999999873))
            ThreePointArc((-0.02236067977499969, 0.4799999999999873), (-0.02999999999999931, 0.24999999999999378), (-0.02999999999999936, 1e-17))
            Line((-0.02999999999999936, 1e-17), (-1e-17, -0.03000000000000003))
            Line((-1e-17, -0.03000000000000003), (1.1180339887498825, -0.03000000000000003))
            Line((1.1180339887498825, -0.03000000000000003), (1.1180339887498825, 0))
        make_face()
    cong_3_piece_10 = extrude(amount=5.795084971874706, mode=Mode.PRIVATE)
    cong_3_piece_10 = split(cong_3_piece_10, bisect_by=Plane(origin=(-1.1255205248498321, 5.360916637891656, 13.79577770104442), z_dir=(0, -0.9363291775690445, 0.35112344158839154)), keep=Keep.TOP, mode=Mode.PRIVATE)
    add(cong_3_piece_10)
    with BuildSketch(Plane(origin=(-6.679491924310963, 0.20491502812617934, 5.011106998930529), x_dir=(0.8660254037844338, 1.4527323097483483e-15, -0.5000000000000083), z_dir=(-1.9688e-13, 1, -3.381e-13))) as cong_3_piece_11_section:
        with BuildLine():
            CenterArc((1.1180339887495254, -1.4999999999999998), CONG_3_R, 90.00000000000006, 48.18968510420052)
            Line((-6.02e-15, -0.49999999999959355), (-0.02236067977499678, -0.479999999999585))
            ThreePointArc((-0.02236067977499678, -0.479999999999585), (-0.0300000000000028, -0.24999999999979675), (-0.02999999999999956, 4.1e-16))
            Line((-0.02999999999999956, 4.1e-16), (-3.6e-16, 0.03000000000000001))
            Line((-3.6e-16, 0.03000000000000001), (1.118033988749524, 0.03000000000000005))
            Line((1.118033988749524, 0.03000000000000005), (1.1180339887495243, 5e-17))
        make_face()
    cong_3_piece_11 = extrude(amount=5.795084971873821, mode=Mode.PRIVATE)
    cong_3_piece_11 = split(cong_3_piece_11, bisect_by=Plane(origin=(-5.140831857295105, 5.360916637891735, 4.267699812668589), z_dir=(-0.30408182027976965, -0.9363291775690445, 0.17556172079419374)), keep=Keep.TOP, mode=Mode.PRIVATE)
    add(cong_3_piece_11)
    with BuildSketch(Plane(origin=(-7.679491924311542, 0.20491502812697604, 3.279056191360633), x_dir=(0.8660254037844413, 0, -0.4999999999999951), z_dir=(-8.9e-16, 1, 1.5e-16))) as cong_3_piece_12_section:
        with BuildLine():
            CenterArc((1.1180339887492128, 1.4999999999999998), CONG_3_R, 221.81031489581775, 48.18968510418216)
            Line((1.24e-15, 0.49999999999923594), (-0.02236067977498311, 0.4799999999992207))
            ThreePointArc((-0.02236067977498311, 0.4799999999992207), (-0.02999999999999849, 0.2499999999996187), (-0.02999999999999956, -5e-17))
            Line((-0.02999999999999956, -5e-17), (-1.7e-16, -0.02999999999999994))
            Line((-1.7e-16, -0.02999999999999994), (1.1180339887492108, -0.02999999999999993))
            Line((1.1180339887492108, -0.02999999999999993), (1.118033988749211, -2e-17))
        make_face()
    cong_3_piece_12 = extrude(amount=5.795084971873024, mode=Mode.PRIVATE)
    cong_3_piece_12 = split(cong_3_piece_12, bisect_by=Plane(origin=(-6.26635238214522, 5.3609166378917985, 2.3182410786669125), z_dir=(-0.30408182027976965, -0.9363291775690445, 0.17556172079419374)), keep=Keep.TOP, mode=Mode.PRIVATE)
    add(cong_3_piece_12)

    # Congé4
    cong_4_edges = [part.edges().sort_by_distance(p)[0] for p in [
        (-1.4999999999999987, 6, -25.500000000000007),
        (1.500000000000001, 6, -25.500000000000007),
        (15.464745962155586, 6, -10.660626051768435),
        (16.214745962155575, 6, -7.629537138522904),
        (16.214745962155583, 6, 7.629537138522935),
        (15.464745962155583, 6, 10.660626051768467),
        (1.5000000000000155, 6, 25.500000000000007),
        (-1.4999999999999845, 6, 25.500000000000007),
        (-15.464745962155579, 6, 10.660626051768453),
        (-16.214745962155572, 6, 7.62953713852292),
        (-16.214745962155575, 6, -7.629537138522914),
        (-15.46474596215558, 6, -10.660626051768443),
    ]]
    fillet(cong_4_edges, radius=CONG_4_R - 0.0001)  # a hair under: the kernel refuses the full size


solid = part.part
